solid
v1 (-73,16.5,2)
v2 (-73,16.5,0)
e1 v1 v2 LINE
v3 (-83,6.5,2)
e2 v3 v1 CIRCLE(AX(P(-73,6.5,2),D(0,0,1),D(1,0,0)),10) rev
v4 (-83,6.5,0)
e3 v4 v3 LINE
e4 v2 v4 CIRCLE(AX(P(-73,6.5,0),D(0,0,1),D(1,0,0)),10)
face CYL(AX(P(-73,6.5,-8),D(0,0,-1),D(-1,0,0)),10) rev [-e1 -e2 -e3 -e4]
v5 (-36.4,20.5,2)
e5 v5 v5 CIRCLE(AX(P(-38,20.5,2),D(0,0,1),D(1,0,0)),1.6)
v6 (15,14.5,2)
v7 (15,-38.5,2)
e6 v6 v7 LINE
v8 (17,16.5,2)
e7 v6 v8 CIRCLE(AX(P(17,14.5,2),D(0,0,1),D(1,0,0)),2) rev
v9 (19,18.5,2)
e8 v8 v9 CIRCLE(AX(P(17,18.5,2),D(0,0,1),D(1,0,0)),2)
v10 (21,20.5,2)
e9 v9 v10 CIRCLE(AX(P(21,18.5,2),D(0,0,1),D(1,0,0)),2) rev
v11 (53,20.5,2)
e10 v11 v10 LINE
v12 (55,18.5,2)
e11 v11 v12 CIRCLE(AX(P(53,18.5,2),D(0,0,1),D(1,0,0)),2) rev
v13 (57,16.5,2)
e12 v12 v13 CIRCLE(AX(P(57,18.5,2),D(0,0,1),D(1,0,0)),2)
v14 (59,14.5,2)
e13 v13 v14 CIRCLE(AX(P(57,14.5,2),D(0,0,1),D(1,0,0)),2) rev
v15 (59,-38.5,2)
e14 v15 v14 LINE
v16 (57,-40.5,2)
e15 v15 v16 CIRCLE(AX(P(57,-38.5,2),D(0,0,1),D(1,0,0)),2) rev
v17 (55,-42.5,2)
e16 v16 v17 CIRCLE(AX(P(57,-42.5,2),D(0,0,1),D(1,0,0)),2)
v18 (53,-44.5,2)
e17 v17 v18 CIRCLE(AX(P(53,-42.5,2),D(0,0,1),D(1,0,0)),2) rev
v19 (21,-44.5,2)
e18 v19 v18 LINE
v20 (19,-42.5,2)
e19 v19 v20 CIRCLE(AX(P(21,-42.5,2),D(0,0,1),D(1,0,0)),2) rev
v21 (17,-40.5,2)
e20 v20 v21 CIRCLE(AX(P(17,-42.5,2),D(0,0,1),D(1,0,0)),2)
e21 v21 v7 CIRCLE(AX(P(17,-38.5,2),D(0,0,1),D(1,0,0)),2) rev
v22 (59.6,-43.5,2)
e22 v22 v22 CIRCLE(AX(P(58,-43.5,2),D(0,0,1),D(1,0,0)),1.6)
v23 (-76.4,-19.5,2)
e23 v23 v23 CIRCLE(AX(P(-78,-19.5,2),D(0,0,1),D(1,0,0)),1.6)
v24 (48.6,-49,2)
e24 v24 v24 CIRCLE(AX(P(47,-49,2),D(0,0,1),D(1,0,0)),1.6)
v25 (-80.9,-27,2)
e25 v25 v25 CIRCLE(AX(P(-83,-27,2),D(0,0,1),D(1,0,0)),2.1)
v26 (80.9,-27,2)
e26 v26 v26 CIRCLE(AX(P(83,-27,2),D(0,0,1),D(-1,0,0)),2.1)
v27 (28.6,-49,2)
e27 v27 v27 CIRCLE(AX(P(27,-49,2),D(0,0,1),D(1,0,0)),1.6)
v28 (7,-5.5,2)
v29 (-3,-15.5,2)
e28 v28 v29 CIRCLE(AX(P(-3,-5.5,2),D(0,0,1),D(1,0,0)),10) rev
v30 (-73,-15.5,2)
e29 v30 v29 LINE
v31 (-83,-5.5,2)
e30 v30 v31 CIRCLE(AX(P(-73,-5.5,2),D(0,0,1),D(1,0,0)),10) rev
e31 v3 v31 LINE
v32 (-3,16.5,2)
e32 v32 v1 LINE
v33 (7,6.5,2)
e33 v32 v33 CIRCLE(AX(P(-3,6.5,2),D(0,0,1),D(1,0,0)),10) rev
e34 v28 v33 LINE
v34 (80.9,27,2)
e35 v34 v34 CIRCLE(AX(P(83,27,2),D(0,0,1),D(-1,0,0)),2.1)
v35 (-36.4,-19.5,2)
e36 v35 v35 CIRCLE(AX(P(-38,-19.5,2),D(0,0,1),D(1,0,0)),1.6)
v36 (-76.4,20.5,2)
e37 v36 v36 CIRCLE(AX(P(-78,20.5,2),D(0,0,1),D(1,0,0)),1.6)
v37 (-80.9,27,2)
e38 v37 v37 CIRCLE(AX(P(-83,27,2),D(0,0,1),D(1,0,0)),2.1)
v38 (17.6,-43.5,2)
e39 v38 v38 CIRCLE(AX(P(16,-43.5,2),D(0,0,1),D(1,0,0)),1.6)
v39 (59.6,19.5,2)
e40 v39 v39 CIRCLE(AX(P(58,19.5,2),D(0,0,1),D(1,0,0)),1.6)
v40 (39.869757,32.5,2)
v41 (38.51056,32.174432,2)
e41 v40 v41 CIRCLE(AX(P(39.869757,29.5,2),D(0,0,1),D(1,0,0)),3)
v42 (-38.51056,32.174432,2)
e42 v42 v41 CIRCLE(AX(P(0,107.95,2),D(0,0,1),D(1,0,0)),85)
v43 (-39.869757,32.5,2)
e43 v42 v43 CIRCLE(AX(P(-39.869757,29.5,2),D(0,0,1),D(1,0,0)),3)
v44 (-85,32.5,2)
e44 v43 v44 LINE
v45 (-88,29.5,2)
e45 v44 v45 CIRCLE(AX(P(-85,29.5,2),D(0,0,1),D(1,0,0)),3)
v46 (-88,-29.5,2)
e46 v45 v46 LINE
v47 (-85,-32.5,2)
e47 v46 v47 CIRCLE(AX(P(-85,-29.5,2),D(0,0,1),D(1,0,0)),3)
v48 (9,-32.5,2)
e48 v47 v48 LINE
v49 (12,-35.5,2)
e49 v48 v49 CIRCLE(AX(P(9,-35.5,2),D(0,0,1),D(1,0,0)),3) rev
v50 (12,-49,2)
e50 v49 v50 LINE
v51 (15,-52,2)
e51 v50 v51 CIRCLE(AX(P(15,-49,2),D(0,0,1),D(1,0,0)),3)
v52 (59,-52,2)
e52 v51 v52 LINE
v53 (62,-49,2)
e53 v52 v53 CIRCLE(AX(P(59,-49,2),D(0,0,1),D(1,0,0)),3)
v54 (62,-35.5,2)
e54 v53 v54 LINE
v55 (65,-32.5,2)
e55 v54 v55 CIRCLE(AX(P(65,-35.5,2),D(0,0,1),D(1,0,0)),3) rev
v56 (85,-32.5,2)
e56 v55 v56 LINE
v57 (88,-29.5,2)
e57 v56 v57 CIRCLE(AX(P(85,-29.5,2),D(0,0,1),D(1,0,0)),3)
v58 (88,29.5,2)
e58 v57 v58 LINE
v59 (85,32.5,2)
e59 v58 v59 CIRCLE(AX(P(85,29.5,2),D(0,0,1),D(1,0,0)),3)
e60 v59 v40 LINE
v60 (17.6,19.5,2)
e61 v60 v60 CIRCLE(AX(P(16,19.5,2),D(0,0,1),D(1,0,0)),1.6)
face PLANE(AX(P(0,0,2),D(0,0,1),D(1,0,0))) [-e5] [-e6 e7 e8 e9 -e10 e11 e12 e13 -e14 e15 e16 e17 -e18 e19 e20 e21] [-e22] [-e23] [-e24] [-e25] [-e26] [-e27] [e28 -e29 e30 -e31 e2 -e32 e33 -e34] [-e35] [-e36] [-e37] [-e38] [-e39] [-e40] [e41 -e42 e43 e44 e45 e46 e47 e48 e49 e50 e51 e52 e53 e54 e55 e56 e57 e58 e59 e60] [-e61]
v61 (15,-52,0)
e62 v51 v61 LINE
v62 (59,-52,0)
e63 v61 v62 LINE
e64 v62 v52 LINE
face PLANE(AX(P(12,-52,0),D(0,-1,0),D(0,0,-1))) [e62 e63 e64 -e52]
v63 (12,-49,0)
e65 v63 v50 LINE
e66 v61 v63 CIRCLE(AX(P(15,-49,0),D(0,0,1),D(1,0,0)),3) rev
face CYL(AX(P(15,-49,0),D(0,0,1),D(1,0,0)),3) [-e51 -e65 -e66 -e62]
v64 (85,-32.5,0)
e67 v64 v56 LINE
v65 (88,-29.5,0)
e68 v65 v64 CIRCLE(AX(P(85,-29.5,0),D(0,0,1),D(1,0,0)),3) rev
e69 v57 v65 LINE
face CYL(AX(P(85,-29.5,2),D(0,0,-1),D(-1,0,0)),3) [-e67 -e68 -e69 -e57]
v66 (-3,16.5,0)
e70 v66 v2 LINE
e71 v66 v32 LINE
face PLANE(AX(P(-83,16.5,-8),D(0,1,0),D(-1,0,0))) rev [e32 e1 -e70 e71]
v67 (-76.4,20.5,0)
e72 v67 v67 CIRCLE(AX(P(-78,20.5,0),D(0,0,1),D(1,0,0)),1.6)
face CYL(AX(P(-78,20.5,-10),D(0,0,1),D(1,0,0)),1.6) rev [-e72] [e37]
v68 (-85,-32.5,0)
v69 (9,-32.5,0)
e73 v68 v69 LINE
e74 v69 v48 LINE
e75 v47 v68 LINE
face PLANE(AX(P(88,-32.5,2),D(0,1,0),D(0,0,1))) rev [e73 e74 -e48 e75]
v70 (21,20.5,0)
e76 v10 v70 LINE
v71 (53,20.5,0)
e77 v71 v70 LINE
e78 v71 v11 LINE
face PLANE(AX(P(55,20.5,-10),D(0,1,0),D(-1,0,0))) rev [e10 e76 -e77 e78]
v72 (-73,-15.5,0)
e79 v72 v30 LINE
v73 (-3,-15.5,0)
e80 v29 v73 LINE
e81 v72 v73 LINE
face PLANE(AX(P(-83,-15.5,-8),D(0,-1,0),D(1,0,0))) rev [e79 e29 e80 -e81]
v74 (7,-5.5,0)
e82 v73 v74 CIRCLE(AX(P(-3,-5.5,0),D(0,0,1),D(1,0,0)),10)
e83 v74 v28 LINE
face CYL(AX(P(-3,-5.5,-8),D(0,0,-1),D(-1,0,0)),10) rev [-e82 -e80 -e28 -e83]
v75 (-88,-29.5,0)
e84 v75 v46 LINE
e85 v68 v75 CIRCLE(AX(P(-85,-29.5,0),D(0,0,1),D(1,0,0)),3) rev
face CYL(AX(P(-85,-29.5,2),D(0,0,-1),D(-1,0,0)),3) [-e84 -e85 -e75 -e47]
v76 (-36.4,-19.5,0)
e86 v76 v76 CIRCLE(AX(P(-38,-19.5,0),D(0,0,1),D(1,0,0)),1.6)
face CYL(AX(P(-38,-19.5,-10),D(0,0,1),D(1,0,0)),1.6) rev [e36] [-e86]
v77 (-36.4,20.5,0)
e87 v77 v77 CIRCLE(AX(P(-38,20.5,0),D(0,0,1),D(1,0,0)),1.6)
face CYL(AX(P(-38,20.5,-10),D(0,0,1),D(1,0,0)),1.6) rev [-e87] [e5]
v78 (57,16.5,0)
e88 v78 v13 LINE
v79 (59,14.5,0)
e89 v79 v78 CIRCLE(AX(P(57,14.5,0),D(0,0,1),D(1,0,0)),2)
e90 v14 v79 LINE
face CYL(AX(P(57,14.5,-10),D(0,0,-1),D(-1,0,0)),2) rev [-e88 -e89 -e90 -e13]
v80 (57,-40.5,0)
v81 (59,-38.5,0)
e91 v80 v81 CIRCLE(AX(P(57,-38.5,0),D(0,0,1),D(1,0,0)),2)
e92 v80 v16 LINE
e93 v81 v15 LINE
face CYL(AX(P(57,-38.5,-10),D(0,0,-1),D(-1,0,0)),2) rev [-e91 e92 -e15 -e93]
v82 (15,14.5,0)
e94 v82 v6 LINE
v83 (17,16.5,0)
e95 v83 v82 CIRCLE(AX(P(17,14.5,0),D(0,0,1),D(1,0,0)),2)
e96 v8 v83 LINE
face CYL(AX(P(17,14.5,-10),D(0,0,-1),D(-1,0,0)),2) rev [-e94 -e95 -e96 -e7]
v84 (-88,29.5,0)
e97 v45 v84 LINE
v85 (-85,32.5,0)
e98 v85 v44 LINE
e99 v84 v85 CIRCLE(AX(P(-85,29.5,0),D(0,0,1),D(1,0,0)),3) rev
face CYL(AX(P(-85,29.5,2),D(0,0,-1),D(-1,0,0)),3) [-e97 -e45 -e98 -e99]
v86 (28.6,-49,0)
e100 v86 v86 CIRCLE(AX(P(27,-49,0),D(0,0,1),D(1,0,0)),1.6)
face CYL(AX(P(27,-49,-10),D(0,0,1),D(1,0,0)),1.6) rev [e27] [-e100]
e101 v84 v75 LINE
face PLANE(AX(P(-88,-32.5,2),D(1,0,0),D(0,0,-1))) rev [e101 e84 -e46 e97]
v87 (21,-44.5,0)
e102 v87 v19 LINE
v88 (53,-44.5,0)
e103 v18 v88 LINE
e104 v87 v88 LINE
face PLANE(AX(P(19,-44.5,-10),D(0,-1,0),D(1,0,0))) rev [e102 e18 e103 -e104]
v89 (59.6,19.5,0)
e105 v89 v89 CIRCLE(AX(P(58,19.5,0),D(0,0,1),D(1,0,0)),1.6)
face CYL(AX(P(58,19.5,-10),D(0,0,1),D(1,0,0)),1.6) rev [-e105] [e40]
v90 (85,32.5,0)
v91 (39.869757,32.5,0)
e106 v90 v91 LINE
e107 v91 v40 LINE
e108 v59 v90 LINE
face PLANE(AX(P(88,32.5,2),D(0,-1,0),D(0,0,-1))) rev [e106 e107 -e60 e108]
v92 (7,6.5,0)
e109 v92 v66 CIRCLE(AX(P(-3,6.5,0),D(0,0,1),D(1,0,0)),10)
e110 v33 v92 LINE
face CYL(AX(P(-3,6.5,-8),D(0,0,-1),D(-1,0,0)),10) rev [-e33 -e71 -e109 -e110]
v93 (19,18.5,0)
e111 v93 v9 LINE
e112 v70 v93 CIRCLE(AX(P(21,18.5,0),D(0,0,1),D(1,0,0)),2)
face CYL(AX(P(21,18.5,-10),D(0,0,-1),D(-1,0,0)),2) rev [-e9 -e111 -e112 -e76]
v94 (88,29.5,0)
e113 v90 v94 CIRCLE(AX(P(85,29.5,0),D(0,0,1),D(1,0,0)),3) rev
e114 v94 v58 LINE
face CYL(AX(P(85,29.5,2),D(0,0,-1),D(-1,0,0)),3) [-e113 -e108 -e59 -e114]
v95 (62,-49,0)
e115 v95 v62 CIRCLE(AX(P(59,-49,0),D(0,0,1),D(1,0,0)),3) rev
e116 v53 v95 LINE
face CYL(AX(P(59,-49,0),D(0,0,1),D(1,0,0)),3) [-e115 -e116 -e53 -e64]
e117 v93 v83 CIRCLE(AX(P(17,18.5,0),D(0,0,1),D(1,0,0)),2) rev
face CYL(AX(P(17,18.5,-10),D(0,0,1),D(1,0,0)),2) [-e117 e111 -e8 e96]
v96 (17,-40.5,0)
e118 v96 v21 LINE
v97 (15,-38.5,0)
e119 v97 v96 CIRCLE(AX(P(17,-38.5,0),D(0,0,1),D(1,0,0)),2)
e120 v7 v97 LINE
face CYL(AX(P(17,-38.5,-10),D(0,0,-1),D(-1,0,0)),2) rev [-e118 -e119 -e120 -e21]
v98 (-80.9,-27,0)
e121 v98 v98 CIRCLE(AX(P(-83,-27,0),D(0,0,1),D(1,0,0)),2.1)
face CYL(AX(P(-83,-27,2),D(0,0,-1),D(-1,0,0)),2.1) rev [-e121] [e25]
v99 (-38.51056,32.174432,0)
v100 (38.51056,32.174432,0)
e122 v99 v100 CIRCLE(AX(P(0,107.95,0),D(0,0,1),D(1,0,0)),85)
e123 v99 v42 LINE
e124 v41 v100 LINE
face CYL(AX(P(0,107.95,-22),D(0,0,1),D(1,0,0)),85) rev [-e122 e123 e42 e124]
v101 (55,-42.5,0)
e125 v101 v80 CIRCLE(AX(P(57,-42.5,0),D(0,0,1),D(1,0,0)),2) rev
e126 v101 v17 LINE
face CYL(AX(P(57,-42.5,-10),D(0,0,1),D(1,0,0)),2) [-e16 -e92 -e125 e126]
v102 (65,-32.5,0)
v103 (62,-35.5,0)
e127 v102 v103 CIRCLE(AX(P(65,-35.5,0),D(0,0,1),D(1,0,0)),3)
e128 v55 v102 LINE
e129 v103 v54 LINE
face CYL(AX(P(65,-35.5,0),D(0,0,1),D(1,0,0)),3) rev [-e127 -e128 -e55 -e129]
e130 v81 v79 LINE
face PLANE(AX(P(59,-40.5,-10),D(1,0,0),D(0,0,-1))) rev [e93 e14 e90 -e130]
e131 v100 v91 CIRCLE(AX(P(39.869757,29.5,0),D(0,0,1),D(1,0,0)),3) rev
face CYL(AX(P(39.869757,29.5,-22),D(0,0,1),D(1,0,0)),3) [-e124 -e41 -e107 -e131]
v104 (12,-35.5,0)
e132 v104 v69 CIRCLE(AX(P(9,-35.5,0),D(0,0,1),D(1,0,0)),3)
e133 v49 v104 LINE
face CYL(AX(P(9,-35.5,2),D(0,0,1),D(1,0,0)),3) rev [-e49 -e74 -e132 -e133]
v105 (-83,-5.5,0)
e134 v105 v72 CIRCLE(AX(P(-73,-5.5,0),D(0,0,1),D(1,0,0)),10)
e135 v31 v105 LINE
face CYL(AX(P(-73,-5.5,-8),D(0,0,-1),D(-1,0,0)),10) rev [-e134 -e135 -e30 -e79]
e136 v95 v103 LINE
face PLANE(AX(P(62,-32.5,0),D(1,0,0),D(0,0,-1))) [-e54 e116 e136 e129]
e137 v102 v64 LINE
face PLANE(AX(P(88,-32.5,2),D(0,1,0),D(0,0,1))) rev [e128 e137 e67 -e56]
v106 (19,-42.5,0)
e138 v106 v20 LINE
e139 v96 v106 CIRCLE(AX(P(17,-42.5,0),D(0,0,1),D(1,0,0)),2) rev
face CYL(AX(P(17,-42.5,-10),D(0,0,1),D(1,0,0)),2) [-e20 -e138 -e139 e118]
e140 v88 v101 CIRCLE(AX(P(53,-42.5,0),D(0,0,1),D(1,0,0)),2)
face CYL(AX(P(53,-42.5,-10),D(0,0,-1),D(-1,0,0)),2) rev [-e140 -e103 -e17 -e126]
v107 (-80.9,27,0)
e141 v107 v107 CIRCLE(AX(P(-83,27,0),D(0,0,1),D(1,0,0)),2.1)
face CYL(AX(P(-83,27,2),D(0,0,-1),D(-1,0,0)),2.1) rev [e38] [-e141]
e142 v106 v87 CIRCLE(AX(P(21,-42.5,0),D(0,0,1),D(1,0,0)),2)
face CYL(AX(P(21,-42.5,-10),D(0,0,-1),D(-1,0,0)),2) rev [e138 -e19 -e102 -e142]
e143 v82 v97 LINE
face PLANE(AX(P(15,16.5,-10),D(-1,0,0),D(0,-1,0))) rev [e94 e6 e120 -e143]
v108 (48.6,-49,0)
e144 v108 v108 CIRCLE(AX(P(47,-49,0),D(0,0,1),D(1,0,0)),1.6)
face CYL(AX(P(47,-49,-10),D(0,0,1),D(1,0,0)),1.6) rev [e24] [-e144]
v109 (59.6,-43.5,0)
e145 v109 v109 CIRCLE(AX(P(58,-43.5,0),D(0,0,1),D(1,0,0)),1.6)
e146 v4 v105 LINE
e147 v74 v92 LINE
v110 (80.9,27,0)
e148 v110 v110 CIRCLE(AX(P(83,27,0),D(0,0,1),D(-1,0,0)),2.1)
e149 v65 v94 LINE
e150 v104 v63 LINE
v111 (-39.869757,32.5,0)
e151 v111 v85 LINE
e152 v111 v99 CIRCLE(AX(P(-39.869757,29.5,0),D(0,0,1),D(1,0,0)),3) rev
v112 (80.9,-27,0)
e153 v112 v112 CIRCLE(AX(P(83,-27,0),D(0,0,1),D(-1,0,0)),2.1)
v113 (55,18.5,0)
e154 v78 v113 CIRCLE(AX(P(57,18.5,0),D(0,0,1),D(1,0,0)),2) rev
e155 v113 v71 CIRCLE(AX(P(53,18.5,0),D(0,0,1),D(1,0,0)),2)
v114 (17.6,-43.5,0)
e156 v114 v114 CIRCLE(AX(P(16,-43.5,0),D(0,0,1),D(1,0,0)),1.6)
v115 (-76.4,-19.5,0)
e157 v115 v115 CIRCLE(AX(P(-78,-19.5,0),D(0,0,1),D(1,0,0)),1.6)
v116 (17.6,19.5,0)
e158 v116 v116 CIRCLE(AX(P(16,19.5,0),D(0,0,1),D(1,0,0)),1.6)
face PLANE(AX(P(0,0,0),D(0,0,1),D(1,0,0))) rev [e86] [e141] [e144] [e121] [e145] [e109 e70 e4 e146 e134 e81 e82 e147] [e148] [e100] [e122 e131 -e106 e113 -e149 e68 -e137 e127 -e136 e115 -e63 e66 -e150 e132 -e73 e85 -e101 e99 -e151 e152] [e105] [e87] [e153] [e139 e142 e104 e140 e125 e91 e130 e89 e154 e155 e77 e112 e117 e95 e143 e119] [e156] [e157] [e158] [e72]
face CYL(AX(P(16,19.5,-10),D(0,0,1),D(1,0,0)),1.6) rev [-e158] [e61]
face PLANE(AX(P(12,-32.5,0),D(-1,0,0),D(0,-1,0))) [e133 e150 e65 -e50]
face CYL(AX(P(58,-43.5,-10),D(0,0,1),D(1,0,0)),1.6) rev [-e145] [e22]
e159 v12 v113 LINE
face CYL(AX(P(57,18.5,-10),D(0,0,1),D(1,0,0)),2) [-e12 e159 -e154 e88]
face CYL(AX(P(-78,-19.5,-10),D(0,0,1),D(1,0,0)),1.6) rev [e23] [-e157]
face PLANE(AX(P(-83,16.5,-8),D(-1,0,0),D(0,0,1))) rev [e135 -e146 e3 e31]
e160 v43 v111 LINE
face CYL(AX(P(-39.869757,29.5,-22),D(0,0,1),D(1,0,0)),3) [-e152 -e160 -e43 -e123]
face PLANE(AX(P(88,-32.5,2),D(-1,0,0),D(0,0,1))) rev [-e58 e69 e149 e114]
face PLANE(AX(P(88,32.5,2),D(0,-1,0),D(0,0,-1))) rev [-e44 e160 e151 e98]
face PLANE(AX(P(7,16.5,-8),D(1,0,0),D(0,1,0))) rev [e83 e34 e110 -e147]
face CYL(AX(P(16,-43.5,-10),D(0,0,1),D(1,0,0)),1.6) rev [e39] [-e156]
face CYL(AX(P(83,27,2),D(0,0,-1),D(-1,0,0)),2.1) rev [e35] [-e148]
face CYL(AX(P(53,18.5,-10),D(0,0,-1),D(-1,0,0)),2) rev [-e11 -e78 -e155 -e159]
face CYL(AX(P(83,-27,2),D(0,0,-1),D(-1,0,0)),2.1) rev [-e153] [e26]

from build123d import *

# Parameters (mm, degrees)
SKETCH_1_W          = 176
SKETCH_1_H          = 65
SKETCH_1_R          = 2.1
EXTRUDE_1_DEPTH     = 2
FILLET_1_R          = 3
SKETCH_2_R          = 85
CUT_EXTRUDE_1_DEPTH = 24
SKETCH_4_W          = 50
SKETCH_4_H          = 19.5
EXTRUDE_2_DEPTH     = 2
FILLET_2_R          = 3
SKETCH_3_R          = 1.6
CUT_EXTRUDE_2_DEPTH = 12
FILLET_3_R          = 2
SKETCH_5_R          = 1.6
CUT_EXTRUDE_3_DEPTH = 12
SKETCH_6_R          = 1.6
CUT_EXTRUDE_4_DEPTH = 12
SKETCH_7_W          = 90
SKETCH_7_H          = 32
CUT_EXTRUDE_5_DEPTH = 10
FILLET_4_R          = 10


with BuildPart() as part:
    # 草图1 → 凸台-拉伸1 (new body)
    with BuildSketch(Plane.XY):
        Rectangle(SKETCH_1_W, SKETCH_1_H)
        with Locations((-83, 27)):
            Circle(SKETCH_1_R, mode=Mode.SUBTRACT)
        with Locations((-83, -27)):
            Circle(SKETCH_1_R, mode=Mode.SUBTRACT)
        with Locations(Location((83, -27, 0), (0, 0, 180))):
            Circle(SKETCH_1_R, mode=Mode.SUBTRACT)
        with Locations(Location((83, 27, 0), (0, 0, 180))):
            Circle(SKETCH_1_R, mode=Mode.SUBTRACT)
    extrude(amount=EXTRUDE_1_DEPTH)

    # 圆角1
    fillet_1_edges = [part.edges().sort_by_distance(p)[0] for p in [
        (-88, 32.5, 1),
        (88, 32.5, 1),
        (88, -32.5, 1),
        (-88, -32.5, 1),
    ]]
    fillet(fillet_1_edges, radius=FILLET_1_R)

    # 草图2 → 切除-拉伸1 (cut)
    with BuildSketch(Plane.XY.offset(2)):
        with Locations((0, 107.95)):
            Circle(SKETCH_2_R)
    extrude(amount=-CUT_EXTRUDE_1_DEPTH, mode=Mode.SUBTRACT)

    # 草图4 → 凸台-拉伸2 (add)
    with BuildSketch(Plane.XY.offset(2)):
        with Locations((37, -42.25)):
            Rectangle(SKETCH_4_W, SKETCH_4_H)
    extrude(amount=-EXTRUDE_2_DEPTH)

    # 圆角2
    fillet_2_edges = [part.edges().sort_by_distance(p)[0] for p in [
        (-39.144571782, 32.5, 1),
        (39.144571782, 32.5, 1),
        (12, -52, 1),
        (12, -32.5, 1),
        (62, -32.5, 1),
        (62, -52, 1),
    ]]
    fillet(fillet_2_edges, radius=FILLET_2_R)

    # 草图3 → 切除-拉伸2 (cut)
    with BuildSketch(Plane.XY.offset(2)):
        with Locations((16, 19.5)):
            Circle(SKETCH_3_R)
        with Locations((58, 19.5)):
            Circle(SKETCH_3_R)
        with Locations((58, -43.5)):
            Circle(SKETCH_3_R)
        with Locations((16, -43.5)):
            Circle(SKETCH_3_R)
        Polygon((19, 20.5), (19, 16.5), (15, 16.5), (15, -40.5), (19, -40.5), (19, -44.5), (55, -44.5), (55, -40.5), (59, -40.5), (59, 16.5), (55, 16.5), (55, 20.5), align=None)
    extrude(amount=-CUT_EXTRUDE_2_DEPTH, mode=Mode.SUBTRACT)

    # 圆角3
    fillet_3_edges = [part.edges().sort_by_distance(p)[0] for p in [
        (55, 16.5, 1),
        (59, 16.5, 1),
        (59, -40.5, 1),
        (55, -40.5, 1),
        (55, -44.5, 1),
        (19, -44.5, 1),
        (19, -40.5, 1),
        (15, -40.5, 1),
        (19, 16.5, 1),
        (19, 20.5, 1),
        (55, 20.5, 1),
        (15, 16.5, 1),
    ]]
    fillet(fillet_3_edges, radius=FILLET_3_R - 0.0001)  # a hair under: the kernel refuses the full size

    # 草图5 → 切除-拉伸3 (cut)
    with BuildSketch(Plane.XY.offset(2)):
        with Locations((27, -49)):
            Circle(SKETCH_5_R)
        with Locations((47, -49)):
            Circle(SKETCH_5_R)
    extrude(amount=-CUT_EXTRUDE_3_DEPTH, mode=Mode.SUBTRACT)

    # 草图6 → 切除-拉伸4 (cut)
    with BuildSketch(Plane.XY.offset(2)):
        with Locations((-78, 20.5)):
            Circle(SKETCH_6_R)
        with Locations((-38, 20.5)):
            Circle(SKETCH_6_R)
        with Locations((-38, -19.5)):
            Circle(SKETCH_6_R)
        with Locations((-78, -19.5)):
            Circle(SKETCH_6_R)
    extrude(amount=-CUT_EXTRUDE_4_DEPTH, mode=Mode.SUBTRACT)

    # 草图7 → 切除-拉伸5 (cut)
    with BuildSketch(Plane.XY.offset(2)):
        with Locations((-38, 0.5)):
            Rectangle(SKETCH_7_W, SKETCH_7_H)
    extrude(amount=-CUT_EXTRUDE_5_DEPTH, mode=Mode.SUBTRACT)

    # 圆角4
    fillet_4_edges = [part.edges().sort_by_distance(p)[0] for p in [
        (-83, -15.5, 1),
        (-83, 16.5, 1),
        (7, 16.5, 1),
        (7, -15.5, 1),
    ]]
    fillet(fillet_4_edges, radius=FILLET_4_R)


solid = part.part
